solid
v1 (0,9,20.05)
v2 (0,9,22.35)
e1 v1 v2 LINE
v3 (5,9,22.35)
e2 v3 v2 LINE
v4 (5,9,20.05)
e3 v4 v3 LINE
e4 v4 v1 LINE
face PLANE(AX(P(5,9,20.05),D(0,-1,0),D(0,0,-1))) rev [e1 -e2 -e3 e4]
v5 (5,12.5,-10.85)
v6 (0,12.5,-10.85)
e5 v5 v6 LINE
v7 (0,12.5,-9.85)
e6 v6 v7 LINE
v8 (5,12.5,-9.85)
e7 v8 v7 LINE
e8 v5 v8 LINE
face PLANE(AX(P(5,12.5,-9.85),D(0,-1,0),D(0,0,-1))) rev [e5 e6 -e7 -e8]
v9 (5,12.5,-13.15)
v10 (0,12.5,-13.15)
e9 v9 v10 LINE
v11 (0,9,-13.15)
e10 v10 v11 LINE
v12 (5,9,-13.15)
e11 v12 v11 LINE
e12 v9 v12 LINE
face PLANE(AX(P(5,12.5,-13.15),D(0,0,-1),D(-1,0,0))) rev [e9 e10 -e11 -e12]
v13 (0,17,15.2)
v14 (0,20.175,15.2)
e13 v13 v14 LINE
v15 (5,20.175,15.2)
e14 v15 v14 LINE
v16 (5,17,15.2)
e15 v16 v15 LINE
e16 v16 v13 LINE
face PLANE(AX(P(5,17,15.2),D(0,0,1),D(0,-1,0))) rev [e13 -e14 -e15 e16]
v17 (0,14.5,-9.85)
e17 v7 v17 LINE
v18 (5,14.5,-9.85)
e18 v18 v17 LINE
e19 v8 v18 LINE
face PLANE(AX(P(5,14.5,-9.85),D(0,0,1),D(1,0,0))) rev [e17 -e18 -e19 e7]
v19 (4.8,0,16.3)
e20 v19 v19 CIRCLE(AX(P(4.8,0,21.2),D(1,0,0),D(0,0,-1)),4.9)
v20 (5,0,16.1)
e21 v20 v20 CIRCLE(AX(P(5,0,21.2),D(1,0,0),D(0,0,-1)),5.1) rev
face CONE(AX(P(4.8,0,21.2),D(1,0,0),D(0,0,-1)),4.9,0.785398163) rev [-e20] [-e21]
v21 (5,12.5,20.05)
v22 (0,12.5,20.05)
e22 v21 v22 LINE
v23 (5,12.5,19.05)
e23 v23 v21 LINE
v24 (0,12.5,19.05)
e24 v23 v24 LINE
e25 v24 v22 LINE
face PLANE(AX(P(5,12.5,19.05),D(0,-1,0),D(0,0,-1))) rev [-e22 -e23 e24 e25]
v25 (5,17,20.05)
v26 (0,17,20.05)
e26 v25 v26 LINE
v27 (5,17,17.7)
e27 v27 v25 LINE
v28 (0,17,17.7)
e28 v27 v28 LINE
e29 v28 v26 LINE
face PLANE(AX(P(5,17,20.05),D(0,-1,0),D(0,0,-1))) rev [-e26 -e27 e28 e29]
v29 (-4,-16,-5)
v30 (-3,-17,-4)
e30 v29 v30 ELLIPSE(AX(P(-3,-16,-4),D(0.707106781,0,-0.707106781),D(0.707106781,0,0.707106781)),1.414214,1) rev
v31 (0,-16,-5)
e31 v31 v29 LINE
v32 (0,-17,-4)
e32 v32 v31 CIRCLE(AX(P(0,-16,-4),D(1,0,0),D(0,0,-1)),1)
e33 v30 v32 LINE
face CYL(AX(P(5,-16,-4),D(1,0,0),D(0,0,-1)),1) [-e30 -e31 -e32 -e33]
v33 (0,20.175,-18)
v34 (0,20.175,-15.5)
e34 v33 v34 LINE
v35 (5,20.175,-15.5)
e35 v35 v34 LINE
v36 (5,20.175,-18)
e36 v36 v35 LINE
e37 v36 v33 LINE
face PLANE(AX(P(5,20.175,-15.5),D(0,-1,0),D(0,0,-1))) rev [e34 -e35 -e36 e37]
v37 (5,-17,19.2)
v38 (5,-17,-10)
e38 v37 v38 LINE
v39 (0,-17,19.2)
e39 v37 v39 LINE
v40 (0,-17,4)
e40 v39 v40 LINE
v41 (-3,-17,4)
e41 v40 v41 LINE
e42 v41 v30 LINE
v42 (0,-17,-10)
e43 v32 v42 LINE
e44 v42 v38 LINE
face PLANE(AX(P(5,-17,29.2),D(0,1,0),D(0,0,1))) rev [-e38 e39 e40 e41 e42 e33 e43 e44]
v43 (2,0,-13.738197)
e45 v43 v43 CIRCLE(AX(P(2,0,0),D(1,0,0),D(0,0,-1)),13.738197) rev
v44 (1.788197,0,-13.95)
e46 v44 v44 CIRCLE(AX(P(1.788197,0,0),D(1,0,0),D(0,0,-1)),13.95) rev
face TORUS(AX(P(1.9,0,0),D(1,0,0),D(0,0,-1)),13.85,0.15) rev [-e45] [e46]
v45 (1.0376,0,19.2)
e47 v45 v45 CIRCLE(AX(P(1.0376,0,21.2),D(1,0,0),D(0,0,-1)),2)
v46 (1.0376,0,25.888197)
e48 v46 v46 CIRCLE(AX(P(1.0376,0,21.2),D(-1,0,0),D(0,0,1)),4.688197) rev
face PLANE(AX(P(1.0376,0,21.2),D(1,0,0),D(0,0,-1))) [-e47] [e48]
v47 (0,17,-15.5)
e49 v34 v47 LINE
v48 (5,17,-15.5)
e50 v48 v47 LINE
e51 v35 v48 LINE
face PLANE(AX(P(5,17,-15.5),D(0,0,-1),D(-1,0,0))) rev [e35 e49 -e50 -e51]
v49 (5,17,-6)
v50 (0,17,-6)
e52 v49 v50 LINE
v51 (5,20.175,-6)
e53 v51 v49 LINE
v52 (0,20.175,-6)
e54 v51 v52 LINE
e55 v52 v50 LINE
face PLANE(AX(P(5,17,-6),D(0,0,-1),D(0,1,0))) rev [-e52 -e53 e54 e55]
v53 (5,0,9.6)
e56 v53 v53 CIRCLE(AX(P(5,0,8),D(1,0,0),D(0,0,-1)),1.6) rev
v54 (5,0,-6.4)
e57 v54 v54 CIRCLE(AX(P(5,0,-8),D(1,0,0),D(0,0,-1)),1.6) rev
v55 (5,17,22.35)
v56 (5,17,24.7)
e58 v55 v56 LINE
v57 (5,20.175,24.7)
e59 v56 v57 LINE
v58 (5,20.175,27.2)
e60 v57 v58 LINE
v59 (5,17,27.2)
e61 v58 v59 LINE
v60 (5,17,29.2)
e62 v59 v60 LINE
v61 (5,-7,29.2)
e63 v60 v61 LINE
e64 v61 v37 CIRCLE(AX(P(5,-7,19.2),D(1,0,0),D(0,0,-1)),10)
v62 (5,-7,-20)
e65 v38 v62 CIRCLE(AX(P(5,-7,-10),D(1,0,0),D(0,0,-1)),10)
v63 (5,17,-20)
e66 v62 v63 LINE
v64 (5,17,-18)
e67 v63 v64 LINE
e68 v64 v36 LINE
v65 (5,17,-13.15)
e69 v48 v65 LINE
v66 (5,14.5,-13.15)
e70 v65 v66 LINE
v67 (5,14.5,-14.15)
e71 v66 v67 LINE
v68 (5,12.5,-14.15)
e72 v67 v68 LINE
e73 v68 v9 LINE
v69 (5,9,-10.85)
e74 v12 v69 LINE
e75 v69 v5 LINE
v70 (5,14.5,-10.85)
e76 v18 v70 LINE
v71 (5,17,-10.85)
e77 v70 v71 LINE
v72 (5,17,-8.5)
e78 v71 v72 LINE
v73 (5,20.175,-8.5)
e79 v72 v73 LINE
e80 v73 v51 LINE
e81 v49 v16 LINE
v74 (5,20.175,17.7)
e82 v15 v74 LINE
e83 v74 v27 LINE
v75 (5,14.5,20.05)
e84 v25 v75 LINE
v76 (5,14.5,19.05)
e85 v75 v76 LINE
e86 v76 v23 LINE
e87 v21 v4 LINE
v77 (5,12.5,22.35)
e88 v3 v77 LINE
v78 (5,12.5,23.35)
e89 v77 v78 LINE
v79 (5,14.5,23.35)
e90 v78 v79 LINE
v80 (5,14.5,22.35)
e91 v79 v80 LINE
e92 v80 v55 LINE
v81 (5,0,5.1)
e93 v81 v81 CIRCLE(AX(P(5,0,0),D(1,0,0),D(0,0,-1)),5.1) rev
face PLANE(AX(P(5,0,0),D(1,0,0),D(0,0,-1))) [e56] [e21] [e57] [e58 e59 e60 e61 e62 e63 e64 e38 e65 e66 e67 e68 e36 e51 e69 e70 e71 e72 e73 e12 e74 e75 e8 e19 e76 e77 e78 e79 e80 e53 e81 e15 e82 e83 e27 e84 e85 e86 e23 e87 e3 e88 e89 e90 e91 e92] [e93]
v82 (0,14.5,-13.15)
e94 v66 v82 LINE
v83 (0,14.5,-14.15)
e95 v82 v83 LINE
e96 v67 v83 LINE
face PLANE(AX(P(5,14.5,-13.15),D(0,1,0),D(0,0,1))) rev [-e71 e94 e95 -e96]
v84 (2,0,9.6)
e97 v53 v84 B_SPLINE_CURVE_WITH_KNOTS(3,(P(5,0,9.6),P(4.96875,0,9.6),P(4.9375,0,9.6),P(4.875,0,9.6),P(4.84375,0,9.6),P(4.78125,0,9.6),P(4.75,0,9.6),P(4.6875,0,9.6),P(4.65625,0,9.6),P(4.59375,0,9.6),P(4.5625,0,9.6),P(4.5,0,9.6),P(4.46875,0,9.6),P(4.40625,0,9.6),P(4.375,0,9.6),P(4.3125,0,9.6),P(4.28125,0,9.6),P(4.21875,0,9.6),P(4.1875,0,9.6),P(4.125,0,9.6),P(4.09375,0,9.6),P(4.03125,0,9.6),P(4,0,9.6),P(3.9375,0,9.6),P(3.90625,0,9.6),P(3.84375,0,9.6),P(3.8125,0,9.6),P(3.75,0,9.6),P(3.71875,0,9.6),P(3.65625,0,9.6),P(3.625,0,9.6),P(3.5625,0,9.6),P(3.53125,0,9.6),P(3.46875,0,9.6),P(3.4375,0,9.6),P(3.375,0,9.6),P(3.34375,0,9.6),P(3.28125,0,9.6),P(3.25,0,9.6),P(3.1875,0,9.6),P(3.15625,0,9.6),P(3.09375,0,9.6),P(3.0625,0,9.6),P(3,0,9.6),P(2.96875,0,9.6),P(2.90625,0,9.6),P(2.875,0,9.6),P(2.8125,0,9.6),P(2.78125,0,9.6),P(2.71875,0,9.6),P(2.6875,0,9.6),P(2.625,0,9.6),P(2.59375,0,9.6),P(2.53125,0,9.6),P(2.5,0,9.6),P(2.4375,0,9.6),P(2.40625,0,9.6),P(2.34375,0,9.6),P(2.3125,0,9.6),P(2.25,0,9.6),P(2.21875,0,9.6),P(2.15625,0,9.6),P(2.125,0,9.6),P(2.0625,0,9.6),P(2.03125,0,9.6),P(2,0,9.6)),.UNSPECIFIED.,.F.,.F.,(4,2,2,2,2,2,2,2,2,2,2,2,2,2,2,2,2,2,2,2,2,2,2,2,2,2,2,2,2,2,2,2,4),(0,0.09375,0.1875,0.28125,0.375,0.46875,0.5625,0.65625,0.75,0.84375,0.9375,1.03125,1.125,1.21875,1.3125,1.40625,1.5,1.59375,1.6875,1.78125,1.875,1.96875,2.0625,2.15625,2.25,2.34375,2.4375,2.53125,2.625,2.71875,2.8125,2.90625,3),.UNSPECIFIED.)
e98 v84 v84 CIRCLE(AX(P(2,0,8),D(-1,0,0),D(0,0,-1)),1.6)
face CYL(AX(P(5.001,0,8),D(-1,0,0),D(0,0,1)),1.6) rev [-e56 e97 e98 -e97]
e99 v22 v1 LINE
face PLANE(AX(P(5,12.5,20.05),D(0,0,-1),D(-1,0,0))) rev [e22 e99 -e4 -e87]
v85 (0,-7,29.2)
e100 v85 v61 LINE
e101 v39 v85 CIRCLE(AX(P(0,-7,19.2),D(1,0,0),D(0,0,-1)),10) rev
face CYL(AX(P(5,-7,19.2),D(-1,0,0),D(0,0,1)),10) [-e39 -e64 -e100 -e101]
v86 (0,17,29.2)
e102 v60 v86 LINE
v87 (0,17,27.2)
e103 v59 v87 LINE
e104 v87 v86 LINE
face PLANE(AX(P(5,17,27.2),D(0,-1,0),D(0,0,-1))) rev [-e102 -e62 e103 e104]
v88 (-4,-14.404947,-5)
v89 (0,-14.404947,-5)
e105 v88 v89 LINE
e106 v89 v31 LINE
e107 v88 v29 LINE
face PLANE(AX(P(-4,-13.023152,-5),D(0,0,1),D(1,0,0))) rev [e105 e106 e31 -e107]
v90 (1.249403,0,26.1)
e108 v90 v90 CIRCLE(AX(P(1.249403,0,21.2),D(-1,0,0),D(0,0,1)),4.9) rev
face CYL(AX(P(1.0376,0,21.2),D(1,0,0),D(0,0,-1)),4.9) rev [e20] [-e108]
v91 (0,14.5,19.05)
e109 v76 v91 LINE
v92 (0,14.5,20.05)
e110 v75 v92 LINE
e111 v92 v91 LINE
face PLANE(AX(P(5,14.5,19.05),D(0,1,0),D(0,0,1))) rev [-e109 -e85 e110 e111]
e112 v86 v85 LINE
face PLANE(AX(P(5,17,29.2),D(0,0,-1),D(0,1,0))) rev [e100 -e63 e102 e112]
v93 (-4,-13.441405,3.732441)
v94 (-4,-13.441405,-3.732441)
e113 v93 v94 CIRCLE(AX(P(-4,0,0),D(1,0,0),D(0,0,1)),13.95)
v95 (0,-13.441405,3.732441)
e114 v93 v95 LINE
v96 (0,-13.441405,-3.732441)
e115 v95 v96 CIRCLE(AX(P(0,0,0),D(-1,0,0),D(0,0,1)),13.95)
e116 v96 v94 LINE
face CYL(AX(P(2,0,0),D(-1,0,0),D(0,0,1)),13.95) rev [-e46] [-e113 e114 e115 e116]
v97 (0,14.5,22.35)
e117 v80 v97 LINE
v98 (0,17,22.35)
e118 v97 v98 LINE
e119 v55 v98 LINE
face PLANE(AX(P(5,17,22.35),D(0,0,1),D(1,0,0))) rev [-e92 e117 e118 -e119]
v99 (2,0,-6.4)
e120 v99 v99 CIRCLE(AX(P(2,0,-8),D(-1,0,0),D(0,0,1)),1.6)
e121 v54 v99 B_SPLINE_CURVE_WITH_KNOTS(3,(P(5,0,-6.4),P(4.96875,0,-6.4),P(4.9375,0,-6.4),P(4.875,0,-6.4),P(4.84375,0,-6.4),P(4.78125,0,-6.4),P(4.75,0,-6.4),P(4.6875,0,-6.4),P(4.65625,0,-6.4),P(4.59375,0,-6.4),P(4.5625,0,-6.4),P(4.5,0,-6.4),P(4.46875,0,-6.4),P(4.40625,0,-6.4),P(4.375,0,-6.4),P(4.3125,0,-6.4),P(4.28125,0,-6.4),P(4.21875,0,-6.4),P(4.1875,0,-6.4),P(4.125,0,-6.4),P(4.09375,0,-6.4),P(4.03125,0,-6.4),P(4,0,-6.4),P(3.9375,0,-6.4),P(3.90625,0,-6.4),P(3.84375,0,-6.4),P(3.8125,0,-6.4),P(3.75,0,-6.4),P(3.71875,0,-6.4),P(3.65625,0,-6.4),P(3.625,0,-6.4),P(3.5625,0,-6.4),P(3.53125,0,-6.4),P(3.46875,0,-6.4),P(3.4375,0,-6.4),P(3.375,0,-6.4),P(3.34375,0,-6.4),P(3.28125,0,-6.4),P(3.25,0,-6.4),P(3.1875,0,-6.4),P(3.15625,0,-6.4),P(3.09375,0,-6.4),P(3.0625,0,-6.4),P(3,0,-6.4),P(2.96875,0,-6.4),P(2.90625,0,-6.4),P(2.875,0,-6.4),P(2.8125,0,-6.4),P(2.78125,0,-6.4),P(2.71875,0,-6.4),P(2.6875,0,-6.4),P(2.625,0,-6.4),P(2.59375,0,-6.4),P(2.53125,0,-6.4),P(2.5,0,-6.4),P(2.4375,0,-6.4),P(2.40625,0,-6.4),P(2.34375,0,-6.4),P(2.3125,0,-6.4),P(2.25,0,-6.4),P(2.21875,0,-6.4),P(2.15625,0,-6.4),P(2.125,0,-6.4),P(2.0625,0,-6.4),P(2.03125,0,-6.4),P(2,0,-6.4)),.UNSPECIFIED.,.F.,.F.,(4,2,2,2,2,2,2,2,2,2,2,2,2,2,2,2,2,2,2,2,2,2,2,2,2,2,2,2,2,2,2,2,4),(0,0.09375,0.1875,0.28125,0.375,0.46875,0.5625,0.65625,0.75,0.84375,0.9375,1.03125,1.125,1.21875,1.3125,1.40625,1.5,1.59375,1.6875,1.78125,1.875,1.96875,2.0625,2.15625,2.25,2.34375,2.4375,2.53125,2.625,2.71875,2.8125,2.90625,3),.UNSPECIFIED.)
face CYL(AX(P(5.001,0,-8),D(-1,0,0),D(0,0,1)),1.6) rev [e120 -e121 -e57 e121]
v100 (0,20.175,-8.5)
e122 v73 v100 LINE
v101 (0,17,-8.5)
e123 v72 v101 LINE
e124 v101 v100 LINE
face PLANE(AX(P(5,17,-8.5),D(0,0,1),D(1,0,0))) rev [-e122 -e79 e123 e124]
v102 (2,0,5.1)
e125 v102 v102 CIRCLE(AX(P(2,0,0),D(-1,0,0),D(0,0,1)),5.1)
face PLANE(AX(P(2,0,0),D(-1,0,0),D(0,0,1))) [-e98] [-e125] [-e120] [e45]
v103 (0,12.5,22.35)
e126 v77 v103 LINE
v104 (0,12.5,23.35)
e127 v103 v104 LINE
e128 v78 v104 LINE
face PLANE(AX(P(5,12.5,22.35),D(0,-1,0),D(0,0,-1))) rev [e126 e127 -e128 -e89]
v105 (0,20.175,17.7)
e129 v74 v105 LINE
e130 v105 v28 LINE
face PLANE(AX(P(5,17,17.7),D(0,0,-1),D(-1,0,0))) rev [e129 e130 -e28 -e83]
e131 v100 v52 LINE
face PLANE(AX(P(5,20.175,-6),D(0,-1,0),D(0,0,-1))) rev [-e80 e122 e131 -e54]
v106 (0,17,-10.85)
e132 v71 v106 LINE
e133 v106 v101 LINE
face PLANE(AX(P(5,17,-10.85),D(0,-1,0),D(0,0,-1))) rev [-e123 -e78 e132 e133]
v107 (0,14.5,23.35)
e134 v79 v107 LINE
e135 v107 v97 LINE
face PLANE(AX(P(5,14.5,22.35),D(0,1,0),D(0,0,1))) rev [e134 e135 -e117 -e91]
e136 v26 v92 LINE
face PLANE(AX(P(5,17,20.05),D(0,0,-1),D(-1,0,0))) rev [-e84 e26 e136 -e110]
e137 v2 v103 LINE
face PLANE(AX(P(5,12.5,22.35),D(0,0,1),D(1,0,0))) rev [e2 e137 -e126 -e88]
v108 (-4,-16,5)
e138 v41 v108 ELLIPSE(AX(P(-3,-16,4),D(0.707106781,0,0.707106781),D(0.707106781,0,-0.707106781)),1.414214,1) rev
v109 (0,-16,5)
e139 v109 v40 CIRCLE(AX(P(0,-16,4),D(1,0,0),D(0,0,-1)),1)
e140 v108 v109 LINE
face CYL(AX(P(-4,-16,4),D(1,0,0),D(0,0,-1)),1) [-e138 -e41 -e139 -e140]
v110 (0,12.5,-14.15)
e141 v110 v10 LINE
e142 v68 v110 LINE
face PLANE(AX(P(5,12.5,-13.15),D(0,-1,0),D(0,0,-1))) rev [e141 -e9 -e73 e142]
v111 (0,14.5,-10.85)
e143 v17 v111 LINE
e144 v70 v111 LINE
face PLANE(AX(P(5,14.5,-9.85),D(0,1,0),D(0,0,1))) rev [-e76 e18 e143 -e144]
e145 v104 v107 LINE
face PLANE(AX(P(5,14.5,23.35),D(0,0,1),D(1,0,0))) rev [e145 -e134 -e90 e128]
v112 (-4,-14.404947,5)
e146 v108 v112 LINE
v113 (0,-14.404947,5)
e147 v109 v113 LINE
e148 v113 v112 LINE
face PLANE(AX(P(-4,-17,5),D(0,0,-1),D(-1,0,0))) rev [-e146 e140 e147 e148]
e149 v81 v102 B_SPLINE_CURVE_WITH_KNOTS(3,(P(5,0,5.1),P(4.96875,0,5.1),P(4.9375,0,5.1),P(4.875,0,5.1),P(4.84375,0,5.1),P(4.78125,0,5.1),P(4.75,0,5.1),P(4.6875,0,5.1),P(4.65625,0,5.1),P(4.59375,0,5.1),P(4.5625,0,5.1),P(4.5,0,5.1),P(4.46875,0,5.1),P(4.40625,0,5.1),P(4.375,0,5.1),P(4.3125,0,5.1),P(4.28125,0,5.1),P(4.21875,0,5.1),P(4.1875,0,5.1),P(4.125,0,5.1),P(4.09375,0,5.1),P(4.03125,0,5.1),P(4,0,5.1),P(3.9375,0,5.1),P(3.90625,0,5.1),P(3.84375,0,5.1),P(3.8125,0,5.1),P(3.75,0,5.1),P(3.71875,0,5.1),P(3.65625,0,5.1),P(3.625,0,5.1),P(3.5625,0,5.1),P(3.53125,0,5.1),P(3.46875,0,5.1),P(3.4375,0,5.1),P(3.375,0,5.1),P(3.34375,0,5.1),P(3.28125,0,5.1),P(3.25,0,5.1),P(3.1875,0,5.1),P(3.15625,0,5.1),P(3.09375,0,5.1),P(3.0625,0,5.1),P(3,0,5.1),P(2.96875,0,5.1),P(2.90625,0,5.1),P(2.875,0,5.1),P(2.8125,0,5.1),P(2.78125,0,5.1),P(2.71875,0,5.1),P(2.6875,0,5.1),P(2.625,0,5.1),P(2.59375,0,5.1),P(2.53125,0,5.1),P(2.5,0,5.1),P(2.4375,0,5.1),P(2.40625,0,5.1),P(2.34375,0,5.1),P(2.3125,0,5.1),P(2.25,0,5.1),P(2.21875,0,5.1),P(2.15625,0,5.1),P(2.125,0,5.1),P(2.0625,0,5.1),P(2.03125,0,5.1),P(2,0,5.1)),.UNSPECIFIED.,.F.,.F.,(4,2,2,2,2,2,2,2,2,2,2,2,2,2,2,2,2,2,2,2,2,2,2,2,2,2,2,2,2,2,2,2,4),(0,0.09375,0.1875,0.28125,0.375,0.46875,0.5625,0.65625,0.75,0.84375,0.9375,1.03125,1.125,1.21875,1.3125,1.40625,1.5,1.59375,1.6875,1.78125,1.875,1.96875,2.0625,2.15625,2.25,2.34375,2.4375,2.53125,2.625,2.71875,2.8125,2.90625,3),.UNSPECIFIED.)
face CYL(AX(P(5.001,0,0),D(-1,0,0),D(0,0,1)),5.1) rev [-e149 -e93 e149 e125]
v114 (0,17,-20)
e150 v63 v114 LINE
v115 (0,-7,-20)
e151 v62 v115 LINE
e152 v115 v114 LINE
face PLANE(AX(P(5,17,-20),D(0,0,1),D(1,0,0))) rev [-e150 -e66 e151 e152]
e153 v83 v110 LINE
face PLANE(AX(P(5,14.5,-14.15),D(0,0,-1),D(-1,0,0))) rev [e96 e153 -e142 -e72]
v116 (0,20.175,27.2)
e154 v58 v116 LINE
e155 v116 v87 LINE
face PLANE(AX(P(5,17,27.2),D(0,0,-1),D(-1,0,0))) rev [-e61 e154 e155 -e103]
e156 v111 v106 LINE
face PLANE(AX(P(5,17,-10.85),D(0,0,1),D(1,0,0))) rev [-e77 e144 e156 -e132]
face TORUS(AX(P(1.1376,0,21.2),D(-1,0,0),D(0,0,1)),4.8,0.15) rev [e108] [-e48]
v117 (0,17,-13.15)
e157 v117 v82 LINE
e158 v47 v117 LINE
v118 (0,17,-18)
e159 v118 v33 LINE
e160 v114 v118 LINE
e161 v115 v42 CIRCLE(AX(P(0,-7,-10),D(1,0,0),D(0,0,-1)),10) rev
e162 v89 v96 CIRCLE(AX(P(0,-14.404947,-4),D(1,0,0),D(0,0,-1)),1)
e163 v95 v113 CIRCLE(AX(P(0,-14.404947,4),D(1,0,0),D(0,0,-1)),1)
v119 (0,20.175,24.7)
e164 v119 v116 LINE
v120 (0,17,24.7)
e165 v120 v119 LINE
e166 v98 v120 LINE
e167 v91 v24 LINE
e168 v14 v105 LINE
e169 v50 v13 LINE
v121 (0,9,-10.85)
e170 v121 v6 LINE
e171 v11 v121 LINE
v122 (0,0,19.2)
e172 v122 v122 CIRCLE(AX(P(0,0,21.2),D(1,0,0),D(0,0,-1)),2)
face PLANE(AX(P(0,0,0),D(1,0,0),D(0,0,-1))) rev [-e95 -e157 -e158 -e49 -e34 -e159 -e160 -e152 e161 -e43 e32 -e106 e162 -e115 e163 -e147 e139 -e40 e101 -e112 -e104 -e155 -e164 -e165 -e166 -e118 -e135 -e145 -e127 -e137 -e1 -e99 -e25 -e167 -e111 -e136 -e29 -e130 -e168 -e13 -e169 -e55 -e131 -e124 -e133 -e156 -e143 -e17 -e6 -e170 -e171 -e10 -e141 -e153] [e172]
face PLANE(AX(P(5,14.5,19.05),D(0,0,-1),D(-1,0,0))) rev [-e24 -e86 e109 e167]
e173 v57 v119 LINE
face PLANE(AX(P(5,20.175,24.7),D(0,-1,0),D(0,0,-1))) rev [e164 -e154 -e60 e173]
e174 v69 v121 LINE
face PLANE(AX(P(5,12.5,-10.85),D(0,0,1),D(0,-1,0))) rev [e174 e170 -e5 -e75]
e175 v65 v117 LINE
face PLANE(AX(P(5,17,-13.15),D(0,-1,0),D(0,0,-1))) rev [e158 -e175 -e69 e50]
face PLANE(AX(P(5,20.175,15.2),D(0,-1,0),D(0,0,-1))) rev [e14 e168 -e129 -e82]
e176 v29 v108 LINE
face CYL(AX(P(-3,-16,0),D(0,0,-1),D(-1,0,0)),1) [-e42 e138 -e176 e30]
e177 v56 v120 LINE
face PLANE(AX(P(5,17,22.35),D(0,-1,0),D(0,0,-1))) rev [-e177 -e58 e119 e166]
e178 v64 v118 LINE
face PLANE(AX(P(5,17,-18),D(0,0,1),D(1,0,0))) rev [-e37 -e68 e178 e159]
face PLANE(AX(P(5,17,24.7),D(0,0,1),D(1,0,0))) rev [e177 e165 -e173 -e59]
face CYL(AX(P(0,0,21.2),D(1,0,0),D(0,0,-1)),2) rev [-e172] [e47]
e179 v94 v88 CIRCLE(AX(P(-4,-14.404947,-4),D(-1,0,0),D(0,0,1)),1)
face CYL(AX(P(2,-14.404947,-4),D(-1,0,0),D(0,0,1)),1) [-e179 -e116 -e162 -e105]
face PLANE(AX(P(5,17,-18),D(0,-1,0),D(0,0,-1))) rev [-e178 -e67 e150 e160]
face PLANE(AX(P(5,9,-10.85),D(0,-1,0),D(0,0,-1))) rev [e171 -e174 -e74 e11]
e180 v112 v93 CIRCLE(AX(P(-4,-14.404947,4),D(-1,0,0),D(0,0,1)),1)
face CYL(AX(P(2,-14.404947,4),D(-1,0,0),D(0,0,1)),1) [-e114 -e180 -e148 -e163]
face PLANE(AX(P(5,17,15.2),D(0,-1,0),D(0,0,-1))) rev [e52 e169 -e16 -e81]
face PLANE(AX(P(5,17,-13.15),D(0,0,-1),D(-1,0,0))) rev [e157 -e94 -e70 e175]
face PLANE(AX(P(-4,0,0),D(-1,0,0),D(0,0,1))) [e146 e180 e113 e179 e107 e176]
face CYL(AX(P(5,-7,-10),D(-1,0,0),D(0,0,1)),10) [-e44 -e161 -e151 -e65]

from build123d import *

# Parameters (mm, degrees)
BOSS_EXTRUDE1_DEPTH = 5
SKETCH2_R           = 13.95
CUT_EXTRUDE1_DEPTH  = 2
SKETCH3_R           = 4.9
CUT_EXTRUDE2_DEPTH  = 3.9624
CUT_EXTRUDE3_REACH  = 37.618
SKETCH4_R           = 1.6
SKETCH4_R_2         = 5.1
SKETCH5_R           = 2
CUT_EXTRUDE4_DEPTH  = 36.712340147
FILLET1_R           = 10
BOSS_EXTRUDE2_START = 4
BOSS_EXTRUDE2_DEPTH = 4
FILLET2_R           = 1
CHAMFER1_SIZE       = 0.2
SKETCH7_R           = 0.15
SKETCH10_R          = 0.15


with BuildPart() as part:
    # Sketch1 → Boss-Extrude1 (new body)
    with BuildSketch(Plane(origin=(0, 0, 0), x_dir=(0, 0, -1), z_dir=(1, 0, 0))):
        Polygon((-29.2, 17), (-29.2, -17), (20, -17), (20, 17), (18, 17), (18, 20.175), (15.5, 20.175), (15.5, 17), (13.15, 17), (13.15, 14.5), (14.15, 14.5), (14.15, 12.5), (13.15, 12.5), (13.15, 9), (10.85, 9), (10.85, 12.5), (9.85, 12.5), (9.85, 14.5), (10.85, 14.5), (10.85, 17), (8.5, 17), (8.5, 20.175), (6, 20.175), (6, 17), (-15.2, 17), (-15.2, 20.175), (-17.7, 20.175), (-17.7, 17), (-20.05, 17), (-20.05, 14.5), (-19.05, 14.5), (-19.05, 12.5), (-20.05, 12.5), (-20.05, 9), (-22.35, 9), (-22.35, 12.5), (-23.35, 12.5), (-23.35, 14.5), (-22.35, 14.5), (-22.35, 17), (-24.7, 17), (-24.7, 20.175), (-27.2, 20.175), (-27.2, 17), align=None)
    extrude(amount=BOSS_EXTRUDE1_DEPTH)

    # Sketch2 → Cut-Extrude1 (cut)
    with BuildSketch(Plane.ZY):
        Circle(SKETCH2_R)
    extrude(amount=-CUT_EXTRUDE1_DEPTH, mode=Mode.SUBTRACT)

    # Sketch3 → Cut-Extrude2 (cut)
    with BuildSketch(Plane(origin=(5, 0, 0), x_dir=(0, 0, -1), z_dir=(1, 0, 0))):
        with Locations((-21.2, 0)):
            Circle(SKETCH3_R)
    extrude(amount=-CUT_EXTRUDE2_DEPTH, mode=Mode.SUBTRACT)

    # Sketch4 → Cut-Extrude3 (cut, up to next)
    with BuildSketch(Plane.ZY.offset(-2), mode=Mode.PRIVATE) as cut_extrude3_sk1:
        with Locations((-8, 0)):
            Circle(SKETCH4_R)
    cut_extrude3_tool1 = extrude(cut_extrude3_sk1.sketch, amount=-CUT_EXTRUDE3_REACH, mode=Mode.PRIVATE) & part.part
    # Sketch4 → Cut-Extrude3 (cut, up to next)
    with BuildSketch(Plane.ZY.offset(-2), mode=Mode.PRIVATE) as cut_extrude3_sk2:
        with Locations((8, 0)):
            Circle(SKETCH4_R)
    cut_extrude3_tool2 = extrude(cut_extrude3_sk2.sketch, amount=-CUT_EXTRUDE3_REACH, mode=Mode.PRIVATE) & part.part
    # Sketch4 → Cut-Extrude3 (cut, up to next)
    with BuildSketch(Plane.ZY.offset(-2), mode=Mode.PRIVATE) as cut_extrude3_sk3:
        Circle(SKETCH4_R_2)
    cut_extrude3_tool3 = extrude(cut_extrude3_sk3.sketch, amount=-CUT_EXTRUDE3_REACH, mode=Mode.PRIVATE) & part.part
    add(cut_extrude3_tool1.solids().sort_by_distance((2, 0, -8))[0], mode=Mode.SUBTRACT)
    add(cut_extrude3_tool2.solids().sort_by_distance((2, 0, 8))[0], mode=Mode.SUBTRACT)
    add(cut_extrude3_tool3.solids().sort_by_distance((2, 0, 0))[0], mode=Mode.SUBTRACT)

    # Sketch5 → Cut-Extrude4 (cut, through all)
    with BuildSketch(Plane(origin=(1.0376, 0, 0), x_dir=(0, 0, -1), z_dir=(1, 0, 0))):
        with Locations((-21.2, 0)):
            Circle(SKETCH5_R)
    extrude(amount=-CUT_EXTRUDE4_DEPTH, mode=Mode.SUBTRACT)

    # Fillet1
    fillet1_edges = [part.edges().sort_by_distance(p)[0] for p in [
        (2.5, -17, -20),
        (2.5, -17, 29.2),
    ]]
    fillet(fillet1_edges, radius=FILLET1_R)

    # Sketch6 → Boss-Extrude2 (add)
    with BuildSketch(Plane.ZY.offset(BOSS_EXTRUDE2_START)):
        with BuildLine():
            Line((-5, -13.02315246), (-5, -17))
            Line((-5, -17), (5, -17))
            Line((5, -17), (5, -13.02315246))
            ThreePointArc((5, -13.02315246), (0, -13.95), (-5, -13.02315246))
        make_face()
    extrude(amount=-BOSS_EXTRUDE2_DEPTH)

    # Fillet2
    fillet2_edges = [part.edges().sort_by_distance(p)[0] for p in [
        (-2, -13.02315246, 5),
        (-2, -13.02315246, -5),
        (-4, -17, 0),
        (-2, -17, 5),
        (-2, -17, -5),
    ]]
    fillet(fillet2_edges, radius=FILLET2_R)

    # Chamfer1
    chamfer1_edges = [part.edges().sort_by_distance(p)[0] for p in [
        (5, 0, 26.1),
    ]]
    chamfer(chamfer1_edges, length=CHAMFER1_SIZE)

    # Sketch7 → Cut-Revolve1 (revolve, cut)
    with BuildSketch(Plane(origin=(0, 0, 0), x_dir=(1, 0, 0), z_dir=(0, 1, 0))):
        with Locations((1.9, -13.85)):
            Circle(SKETCH7_R)
    revolve(axis=Axis((5, 0, 0), (-1, 0, 0)), mode=Mode.SUBTRACT)

    # Sketch10 → Cut-Revolve2 (revolve, cut)
    with BuildSketch(Plane(origin=(0, 0, 0), x_dir=(1, 0, 0), z_dir=(0, 1, 0))):
        with Locations((1.1376, -16.4)):
            Circle(SKETCH10_R)
    revolve(axis=Axis((0, 0, 21.2), (1, 0, 0)), mode=Mode.SUBTRACT)


solid = part.part
